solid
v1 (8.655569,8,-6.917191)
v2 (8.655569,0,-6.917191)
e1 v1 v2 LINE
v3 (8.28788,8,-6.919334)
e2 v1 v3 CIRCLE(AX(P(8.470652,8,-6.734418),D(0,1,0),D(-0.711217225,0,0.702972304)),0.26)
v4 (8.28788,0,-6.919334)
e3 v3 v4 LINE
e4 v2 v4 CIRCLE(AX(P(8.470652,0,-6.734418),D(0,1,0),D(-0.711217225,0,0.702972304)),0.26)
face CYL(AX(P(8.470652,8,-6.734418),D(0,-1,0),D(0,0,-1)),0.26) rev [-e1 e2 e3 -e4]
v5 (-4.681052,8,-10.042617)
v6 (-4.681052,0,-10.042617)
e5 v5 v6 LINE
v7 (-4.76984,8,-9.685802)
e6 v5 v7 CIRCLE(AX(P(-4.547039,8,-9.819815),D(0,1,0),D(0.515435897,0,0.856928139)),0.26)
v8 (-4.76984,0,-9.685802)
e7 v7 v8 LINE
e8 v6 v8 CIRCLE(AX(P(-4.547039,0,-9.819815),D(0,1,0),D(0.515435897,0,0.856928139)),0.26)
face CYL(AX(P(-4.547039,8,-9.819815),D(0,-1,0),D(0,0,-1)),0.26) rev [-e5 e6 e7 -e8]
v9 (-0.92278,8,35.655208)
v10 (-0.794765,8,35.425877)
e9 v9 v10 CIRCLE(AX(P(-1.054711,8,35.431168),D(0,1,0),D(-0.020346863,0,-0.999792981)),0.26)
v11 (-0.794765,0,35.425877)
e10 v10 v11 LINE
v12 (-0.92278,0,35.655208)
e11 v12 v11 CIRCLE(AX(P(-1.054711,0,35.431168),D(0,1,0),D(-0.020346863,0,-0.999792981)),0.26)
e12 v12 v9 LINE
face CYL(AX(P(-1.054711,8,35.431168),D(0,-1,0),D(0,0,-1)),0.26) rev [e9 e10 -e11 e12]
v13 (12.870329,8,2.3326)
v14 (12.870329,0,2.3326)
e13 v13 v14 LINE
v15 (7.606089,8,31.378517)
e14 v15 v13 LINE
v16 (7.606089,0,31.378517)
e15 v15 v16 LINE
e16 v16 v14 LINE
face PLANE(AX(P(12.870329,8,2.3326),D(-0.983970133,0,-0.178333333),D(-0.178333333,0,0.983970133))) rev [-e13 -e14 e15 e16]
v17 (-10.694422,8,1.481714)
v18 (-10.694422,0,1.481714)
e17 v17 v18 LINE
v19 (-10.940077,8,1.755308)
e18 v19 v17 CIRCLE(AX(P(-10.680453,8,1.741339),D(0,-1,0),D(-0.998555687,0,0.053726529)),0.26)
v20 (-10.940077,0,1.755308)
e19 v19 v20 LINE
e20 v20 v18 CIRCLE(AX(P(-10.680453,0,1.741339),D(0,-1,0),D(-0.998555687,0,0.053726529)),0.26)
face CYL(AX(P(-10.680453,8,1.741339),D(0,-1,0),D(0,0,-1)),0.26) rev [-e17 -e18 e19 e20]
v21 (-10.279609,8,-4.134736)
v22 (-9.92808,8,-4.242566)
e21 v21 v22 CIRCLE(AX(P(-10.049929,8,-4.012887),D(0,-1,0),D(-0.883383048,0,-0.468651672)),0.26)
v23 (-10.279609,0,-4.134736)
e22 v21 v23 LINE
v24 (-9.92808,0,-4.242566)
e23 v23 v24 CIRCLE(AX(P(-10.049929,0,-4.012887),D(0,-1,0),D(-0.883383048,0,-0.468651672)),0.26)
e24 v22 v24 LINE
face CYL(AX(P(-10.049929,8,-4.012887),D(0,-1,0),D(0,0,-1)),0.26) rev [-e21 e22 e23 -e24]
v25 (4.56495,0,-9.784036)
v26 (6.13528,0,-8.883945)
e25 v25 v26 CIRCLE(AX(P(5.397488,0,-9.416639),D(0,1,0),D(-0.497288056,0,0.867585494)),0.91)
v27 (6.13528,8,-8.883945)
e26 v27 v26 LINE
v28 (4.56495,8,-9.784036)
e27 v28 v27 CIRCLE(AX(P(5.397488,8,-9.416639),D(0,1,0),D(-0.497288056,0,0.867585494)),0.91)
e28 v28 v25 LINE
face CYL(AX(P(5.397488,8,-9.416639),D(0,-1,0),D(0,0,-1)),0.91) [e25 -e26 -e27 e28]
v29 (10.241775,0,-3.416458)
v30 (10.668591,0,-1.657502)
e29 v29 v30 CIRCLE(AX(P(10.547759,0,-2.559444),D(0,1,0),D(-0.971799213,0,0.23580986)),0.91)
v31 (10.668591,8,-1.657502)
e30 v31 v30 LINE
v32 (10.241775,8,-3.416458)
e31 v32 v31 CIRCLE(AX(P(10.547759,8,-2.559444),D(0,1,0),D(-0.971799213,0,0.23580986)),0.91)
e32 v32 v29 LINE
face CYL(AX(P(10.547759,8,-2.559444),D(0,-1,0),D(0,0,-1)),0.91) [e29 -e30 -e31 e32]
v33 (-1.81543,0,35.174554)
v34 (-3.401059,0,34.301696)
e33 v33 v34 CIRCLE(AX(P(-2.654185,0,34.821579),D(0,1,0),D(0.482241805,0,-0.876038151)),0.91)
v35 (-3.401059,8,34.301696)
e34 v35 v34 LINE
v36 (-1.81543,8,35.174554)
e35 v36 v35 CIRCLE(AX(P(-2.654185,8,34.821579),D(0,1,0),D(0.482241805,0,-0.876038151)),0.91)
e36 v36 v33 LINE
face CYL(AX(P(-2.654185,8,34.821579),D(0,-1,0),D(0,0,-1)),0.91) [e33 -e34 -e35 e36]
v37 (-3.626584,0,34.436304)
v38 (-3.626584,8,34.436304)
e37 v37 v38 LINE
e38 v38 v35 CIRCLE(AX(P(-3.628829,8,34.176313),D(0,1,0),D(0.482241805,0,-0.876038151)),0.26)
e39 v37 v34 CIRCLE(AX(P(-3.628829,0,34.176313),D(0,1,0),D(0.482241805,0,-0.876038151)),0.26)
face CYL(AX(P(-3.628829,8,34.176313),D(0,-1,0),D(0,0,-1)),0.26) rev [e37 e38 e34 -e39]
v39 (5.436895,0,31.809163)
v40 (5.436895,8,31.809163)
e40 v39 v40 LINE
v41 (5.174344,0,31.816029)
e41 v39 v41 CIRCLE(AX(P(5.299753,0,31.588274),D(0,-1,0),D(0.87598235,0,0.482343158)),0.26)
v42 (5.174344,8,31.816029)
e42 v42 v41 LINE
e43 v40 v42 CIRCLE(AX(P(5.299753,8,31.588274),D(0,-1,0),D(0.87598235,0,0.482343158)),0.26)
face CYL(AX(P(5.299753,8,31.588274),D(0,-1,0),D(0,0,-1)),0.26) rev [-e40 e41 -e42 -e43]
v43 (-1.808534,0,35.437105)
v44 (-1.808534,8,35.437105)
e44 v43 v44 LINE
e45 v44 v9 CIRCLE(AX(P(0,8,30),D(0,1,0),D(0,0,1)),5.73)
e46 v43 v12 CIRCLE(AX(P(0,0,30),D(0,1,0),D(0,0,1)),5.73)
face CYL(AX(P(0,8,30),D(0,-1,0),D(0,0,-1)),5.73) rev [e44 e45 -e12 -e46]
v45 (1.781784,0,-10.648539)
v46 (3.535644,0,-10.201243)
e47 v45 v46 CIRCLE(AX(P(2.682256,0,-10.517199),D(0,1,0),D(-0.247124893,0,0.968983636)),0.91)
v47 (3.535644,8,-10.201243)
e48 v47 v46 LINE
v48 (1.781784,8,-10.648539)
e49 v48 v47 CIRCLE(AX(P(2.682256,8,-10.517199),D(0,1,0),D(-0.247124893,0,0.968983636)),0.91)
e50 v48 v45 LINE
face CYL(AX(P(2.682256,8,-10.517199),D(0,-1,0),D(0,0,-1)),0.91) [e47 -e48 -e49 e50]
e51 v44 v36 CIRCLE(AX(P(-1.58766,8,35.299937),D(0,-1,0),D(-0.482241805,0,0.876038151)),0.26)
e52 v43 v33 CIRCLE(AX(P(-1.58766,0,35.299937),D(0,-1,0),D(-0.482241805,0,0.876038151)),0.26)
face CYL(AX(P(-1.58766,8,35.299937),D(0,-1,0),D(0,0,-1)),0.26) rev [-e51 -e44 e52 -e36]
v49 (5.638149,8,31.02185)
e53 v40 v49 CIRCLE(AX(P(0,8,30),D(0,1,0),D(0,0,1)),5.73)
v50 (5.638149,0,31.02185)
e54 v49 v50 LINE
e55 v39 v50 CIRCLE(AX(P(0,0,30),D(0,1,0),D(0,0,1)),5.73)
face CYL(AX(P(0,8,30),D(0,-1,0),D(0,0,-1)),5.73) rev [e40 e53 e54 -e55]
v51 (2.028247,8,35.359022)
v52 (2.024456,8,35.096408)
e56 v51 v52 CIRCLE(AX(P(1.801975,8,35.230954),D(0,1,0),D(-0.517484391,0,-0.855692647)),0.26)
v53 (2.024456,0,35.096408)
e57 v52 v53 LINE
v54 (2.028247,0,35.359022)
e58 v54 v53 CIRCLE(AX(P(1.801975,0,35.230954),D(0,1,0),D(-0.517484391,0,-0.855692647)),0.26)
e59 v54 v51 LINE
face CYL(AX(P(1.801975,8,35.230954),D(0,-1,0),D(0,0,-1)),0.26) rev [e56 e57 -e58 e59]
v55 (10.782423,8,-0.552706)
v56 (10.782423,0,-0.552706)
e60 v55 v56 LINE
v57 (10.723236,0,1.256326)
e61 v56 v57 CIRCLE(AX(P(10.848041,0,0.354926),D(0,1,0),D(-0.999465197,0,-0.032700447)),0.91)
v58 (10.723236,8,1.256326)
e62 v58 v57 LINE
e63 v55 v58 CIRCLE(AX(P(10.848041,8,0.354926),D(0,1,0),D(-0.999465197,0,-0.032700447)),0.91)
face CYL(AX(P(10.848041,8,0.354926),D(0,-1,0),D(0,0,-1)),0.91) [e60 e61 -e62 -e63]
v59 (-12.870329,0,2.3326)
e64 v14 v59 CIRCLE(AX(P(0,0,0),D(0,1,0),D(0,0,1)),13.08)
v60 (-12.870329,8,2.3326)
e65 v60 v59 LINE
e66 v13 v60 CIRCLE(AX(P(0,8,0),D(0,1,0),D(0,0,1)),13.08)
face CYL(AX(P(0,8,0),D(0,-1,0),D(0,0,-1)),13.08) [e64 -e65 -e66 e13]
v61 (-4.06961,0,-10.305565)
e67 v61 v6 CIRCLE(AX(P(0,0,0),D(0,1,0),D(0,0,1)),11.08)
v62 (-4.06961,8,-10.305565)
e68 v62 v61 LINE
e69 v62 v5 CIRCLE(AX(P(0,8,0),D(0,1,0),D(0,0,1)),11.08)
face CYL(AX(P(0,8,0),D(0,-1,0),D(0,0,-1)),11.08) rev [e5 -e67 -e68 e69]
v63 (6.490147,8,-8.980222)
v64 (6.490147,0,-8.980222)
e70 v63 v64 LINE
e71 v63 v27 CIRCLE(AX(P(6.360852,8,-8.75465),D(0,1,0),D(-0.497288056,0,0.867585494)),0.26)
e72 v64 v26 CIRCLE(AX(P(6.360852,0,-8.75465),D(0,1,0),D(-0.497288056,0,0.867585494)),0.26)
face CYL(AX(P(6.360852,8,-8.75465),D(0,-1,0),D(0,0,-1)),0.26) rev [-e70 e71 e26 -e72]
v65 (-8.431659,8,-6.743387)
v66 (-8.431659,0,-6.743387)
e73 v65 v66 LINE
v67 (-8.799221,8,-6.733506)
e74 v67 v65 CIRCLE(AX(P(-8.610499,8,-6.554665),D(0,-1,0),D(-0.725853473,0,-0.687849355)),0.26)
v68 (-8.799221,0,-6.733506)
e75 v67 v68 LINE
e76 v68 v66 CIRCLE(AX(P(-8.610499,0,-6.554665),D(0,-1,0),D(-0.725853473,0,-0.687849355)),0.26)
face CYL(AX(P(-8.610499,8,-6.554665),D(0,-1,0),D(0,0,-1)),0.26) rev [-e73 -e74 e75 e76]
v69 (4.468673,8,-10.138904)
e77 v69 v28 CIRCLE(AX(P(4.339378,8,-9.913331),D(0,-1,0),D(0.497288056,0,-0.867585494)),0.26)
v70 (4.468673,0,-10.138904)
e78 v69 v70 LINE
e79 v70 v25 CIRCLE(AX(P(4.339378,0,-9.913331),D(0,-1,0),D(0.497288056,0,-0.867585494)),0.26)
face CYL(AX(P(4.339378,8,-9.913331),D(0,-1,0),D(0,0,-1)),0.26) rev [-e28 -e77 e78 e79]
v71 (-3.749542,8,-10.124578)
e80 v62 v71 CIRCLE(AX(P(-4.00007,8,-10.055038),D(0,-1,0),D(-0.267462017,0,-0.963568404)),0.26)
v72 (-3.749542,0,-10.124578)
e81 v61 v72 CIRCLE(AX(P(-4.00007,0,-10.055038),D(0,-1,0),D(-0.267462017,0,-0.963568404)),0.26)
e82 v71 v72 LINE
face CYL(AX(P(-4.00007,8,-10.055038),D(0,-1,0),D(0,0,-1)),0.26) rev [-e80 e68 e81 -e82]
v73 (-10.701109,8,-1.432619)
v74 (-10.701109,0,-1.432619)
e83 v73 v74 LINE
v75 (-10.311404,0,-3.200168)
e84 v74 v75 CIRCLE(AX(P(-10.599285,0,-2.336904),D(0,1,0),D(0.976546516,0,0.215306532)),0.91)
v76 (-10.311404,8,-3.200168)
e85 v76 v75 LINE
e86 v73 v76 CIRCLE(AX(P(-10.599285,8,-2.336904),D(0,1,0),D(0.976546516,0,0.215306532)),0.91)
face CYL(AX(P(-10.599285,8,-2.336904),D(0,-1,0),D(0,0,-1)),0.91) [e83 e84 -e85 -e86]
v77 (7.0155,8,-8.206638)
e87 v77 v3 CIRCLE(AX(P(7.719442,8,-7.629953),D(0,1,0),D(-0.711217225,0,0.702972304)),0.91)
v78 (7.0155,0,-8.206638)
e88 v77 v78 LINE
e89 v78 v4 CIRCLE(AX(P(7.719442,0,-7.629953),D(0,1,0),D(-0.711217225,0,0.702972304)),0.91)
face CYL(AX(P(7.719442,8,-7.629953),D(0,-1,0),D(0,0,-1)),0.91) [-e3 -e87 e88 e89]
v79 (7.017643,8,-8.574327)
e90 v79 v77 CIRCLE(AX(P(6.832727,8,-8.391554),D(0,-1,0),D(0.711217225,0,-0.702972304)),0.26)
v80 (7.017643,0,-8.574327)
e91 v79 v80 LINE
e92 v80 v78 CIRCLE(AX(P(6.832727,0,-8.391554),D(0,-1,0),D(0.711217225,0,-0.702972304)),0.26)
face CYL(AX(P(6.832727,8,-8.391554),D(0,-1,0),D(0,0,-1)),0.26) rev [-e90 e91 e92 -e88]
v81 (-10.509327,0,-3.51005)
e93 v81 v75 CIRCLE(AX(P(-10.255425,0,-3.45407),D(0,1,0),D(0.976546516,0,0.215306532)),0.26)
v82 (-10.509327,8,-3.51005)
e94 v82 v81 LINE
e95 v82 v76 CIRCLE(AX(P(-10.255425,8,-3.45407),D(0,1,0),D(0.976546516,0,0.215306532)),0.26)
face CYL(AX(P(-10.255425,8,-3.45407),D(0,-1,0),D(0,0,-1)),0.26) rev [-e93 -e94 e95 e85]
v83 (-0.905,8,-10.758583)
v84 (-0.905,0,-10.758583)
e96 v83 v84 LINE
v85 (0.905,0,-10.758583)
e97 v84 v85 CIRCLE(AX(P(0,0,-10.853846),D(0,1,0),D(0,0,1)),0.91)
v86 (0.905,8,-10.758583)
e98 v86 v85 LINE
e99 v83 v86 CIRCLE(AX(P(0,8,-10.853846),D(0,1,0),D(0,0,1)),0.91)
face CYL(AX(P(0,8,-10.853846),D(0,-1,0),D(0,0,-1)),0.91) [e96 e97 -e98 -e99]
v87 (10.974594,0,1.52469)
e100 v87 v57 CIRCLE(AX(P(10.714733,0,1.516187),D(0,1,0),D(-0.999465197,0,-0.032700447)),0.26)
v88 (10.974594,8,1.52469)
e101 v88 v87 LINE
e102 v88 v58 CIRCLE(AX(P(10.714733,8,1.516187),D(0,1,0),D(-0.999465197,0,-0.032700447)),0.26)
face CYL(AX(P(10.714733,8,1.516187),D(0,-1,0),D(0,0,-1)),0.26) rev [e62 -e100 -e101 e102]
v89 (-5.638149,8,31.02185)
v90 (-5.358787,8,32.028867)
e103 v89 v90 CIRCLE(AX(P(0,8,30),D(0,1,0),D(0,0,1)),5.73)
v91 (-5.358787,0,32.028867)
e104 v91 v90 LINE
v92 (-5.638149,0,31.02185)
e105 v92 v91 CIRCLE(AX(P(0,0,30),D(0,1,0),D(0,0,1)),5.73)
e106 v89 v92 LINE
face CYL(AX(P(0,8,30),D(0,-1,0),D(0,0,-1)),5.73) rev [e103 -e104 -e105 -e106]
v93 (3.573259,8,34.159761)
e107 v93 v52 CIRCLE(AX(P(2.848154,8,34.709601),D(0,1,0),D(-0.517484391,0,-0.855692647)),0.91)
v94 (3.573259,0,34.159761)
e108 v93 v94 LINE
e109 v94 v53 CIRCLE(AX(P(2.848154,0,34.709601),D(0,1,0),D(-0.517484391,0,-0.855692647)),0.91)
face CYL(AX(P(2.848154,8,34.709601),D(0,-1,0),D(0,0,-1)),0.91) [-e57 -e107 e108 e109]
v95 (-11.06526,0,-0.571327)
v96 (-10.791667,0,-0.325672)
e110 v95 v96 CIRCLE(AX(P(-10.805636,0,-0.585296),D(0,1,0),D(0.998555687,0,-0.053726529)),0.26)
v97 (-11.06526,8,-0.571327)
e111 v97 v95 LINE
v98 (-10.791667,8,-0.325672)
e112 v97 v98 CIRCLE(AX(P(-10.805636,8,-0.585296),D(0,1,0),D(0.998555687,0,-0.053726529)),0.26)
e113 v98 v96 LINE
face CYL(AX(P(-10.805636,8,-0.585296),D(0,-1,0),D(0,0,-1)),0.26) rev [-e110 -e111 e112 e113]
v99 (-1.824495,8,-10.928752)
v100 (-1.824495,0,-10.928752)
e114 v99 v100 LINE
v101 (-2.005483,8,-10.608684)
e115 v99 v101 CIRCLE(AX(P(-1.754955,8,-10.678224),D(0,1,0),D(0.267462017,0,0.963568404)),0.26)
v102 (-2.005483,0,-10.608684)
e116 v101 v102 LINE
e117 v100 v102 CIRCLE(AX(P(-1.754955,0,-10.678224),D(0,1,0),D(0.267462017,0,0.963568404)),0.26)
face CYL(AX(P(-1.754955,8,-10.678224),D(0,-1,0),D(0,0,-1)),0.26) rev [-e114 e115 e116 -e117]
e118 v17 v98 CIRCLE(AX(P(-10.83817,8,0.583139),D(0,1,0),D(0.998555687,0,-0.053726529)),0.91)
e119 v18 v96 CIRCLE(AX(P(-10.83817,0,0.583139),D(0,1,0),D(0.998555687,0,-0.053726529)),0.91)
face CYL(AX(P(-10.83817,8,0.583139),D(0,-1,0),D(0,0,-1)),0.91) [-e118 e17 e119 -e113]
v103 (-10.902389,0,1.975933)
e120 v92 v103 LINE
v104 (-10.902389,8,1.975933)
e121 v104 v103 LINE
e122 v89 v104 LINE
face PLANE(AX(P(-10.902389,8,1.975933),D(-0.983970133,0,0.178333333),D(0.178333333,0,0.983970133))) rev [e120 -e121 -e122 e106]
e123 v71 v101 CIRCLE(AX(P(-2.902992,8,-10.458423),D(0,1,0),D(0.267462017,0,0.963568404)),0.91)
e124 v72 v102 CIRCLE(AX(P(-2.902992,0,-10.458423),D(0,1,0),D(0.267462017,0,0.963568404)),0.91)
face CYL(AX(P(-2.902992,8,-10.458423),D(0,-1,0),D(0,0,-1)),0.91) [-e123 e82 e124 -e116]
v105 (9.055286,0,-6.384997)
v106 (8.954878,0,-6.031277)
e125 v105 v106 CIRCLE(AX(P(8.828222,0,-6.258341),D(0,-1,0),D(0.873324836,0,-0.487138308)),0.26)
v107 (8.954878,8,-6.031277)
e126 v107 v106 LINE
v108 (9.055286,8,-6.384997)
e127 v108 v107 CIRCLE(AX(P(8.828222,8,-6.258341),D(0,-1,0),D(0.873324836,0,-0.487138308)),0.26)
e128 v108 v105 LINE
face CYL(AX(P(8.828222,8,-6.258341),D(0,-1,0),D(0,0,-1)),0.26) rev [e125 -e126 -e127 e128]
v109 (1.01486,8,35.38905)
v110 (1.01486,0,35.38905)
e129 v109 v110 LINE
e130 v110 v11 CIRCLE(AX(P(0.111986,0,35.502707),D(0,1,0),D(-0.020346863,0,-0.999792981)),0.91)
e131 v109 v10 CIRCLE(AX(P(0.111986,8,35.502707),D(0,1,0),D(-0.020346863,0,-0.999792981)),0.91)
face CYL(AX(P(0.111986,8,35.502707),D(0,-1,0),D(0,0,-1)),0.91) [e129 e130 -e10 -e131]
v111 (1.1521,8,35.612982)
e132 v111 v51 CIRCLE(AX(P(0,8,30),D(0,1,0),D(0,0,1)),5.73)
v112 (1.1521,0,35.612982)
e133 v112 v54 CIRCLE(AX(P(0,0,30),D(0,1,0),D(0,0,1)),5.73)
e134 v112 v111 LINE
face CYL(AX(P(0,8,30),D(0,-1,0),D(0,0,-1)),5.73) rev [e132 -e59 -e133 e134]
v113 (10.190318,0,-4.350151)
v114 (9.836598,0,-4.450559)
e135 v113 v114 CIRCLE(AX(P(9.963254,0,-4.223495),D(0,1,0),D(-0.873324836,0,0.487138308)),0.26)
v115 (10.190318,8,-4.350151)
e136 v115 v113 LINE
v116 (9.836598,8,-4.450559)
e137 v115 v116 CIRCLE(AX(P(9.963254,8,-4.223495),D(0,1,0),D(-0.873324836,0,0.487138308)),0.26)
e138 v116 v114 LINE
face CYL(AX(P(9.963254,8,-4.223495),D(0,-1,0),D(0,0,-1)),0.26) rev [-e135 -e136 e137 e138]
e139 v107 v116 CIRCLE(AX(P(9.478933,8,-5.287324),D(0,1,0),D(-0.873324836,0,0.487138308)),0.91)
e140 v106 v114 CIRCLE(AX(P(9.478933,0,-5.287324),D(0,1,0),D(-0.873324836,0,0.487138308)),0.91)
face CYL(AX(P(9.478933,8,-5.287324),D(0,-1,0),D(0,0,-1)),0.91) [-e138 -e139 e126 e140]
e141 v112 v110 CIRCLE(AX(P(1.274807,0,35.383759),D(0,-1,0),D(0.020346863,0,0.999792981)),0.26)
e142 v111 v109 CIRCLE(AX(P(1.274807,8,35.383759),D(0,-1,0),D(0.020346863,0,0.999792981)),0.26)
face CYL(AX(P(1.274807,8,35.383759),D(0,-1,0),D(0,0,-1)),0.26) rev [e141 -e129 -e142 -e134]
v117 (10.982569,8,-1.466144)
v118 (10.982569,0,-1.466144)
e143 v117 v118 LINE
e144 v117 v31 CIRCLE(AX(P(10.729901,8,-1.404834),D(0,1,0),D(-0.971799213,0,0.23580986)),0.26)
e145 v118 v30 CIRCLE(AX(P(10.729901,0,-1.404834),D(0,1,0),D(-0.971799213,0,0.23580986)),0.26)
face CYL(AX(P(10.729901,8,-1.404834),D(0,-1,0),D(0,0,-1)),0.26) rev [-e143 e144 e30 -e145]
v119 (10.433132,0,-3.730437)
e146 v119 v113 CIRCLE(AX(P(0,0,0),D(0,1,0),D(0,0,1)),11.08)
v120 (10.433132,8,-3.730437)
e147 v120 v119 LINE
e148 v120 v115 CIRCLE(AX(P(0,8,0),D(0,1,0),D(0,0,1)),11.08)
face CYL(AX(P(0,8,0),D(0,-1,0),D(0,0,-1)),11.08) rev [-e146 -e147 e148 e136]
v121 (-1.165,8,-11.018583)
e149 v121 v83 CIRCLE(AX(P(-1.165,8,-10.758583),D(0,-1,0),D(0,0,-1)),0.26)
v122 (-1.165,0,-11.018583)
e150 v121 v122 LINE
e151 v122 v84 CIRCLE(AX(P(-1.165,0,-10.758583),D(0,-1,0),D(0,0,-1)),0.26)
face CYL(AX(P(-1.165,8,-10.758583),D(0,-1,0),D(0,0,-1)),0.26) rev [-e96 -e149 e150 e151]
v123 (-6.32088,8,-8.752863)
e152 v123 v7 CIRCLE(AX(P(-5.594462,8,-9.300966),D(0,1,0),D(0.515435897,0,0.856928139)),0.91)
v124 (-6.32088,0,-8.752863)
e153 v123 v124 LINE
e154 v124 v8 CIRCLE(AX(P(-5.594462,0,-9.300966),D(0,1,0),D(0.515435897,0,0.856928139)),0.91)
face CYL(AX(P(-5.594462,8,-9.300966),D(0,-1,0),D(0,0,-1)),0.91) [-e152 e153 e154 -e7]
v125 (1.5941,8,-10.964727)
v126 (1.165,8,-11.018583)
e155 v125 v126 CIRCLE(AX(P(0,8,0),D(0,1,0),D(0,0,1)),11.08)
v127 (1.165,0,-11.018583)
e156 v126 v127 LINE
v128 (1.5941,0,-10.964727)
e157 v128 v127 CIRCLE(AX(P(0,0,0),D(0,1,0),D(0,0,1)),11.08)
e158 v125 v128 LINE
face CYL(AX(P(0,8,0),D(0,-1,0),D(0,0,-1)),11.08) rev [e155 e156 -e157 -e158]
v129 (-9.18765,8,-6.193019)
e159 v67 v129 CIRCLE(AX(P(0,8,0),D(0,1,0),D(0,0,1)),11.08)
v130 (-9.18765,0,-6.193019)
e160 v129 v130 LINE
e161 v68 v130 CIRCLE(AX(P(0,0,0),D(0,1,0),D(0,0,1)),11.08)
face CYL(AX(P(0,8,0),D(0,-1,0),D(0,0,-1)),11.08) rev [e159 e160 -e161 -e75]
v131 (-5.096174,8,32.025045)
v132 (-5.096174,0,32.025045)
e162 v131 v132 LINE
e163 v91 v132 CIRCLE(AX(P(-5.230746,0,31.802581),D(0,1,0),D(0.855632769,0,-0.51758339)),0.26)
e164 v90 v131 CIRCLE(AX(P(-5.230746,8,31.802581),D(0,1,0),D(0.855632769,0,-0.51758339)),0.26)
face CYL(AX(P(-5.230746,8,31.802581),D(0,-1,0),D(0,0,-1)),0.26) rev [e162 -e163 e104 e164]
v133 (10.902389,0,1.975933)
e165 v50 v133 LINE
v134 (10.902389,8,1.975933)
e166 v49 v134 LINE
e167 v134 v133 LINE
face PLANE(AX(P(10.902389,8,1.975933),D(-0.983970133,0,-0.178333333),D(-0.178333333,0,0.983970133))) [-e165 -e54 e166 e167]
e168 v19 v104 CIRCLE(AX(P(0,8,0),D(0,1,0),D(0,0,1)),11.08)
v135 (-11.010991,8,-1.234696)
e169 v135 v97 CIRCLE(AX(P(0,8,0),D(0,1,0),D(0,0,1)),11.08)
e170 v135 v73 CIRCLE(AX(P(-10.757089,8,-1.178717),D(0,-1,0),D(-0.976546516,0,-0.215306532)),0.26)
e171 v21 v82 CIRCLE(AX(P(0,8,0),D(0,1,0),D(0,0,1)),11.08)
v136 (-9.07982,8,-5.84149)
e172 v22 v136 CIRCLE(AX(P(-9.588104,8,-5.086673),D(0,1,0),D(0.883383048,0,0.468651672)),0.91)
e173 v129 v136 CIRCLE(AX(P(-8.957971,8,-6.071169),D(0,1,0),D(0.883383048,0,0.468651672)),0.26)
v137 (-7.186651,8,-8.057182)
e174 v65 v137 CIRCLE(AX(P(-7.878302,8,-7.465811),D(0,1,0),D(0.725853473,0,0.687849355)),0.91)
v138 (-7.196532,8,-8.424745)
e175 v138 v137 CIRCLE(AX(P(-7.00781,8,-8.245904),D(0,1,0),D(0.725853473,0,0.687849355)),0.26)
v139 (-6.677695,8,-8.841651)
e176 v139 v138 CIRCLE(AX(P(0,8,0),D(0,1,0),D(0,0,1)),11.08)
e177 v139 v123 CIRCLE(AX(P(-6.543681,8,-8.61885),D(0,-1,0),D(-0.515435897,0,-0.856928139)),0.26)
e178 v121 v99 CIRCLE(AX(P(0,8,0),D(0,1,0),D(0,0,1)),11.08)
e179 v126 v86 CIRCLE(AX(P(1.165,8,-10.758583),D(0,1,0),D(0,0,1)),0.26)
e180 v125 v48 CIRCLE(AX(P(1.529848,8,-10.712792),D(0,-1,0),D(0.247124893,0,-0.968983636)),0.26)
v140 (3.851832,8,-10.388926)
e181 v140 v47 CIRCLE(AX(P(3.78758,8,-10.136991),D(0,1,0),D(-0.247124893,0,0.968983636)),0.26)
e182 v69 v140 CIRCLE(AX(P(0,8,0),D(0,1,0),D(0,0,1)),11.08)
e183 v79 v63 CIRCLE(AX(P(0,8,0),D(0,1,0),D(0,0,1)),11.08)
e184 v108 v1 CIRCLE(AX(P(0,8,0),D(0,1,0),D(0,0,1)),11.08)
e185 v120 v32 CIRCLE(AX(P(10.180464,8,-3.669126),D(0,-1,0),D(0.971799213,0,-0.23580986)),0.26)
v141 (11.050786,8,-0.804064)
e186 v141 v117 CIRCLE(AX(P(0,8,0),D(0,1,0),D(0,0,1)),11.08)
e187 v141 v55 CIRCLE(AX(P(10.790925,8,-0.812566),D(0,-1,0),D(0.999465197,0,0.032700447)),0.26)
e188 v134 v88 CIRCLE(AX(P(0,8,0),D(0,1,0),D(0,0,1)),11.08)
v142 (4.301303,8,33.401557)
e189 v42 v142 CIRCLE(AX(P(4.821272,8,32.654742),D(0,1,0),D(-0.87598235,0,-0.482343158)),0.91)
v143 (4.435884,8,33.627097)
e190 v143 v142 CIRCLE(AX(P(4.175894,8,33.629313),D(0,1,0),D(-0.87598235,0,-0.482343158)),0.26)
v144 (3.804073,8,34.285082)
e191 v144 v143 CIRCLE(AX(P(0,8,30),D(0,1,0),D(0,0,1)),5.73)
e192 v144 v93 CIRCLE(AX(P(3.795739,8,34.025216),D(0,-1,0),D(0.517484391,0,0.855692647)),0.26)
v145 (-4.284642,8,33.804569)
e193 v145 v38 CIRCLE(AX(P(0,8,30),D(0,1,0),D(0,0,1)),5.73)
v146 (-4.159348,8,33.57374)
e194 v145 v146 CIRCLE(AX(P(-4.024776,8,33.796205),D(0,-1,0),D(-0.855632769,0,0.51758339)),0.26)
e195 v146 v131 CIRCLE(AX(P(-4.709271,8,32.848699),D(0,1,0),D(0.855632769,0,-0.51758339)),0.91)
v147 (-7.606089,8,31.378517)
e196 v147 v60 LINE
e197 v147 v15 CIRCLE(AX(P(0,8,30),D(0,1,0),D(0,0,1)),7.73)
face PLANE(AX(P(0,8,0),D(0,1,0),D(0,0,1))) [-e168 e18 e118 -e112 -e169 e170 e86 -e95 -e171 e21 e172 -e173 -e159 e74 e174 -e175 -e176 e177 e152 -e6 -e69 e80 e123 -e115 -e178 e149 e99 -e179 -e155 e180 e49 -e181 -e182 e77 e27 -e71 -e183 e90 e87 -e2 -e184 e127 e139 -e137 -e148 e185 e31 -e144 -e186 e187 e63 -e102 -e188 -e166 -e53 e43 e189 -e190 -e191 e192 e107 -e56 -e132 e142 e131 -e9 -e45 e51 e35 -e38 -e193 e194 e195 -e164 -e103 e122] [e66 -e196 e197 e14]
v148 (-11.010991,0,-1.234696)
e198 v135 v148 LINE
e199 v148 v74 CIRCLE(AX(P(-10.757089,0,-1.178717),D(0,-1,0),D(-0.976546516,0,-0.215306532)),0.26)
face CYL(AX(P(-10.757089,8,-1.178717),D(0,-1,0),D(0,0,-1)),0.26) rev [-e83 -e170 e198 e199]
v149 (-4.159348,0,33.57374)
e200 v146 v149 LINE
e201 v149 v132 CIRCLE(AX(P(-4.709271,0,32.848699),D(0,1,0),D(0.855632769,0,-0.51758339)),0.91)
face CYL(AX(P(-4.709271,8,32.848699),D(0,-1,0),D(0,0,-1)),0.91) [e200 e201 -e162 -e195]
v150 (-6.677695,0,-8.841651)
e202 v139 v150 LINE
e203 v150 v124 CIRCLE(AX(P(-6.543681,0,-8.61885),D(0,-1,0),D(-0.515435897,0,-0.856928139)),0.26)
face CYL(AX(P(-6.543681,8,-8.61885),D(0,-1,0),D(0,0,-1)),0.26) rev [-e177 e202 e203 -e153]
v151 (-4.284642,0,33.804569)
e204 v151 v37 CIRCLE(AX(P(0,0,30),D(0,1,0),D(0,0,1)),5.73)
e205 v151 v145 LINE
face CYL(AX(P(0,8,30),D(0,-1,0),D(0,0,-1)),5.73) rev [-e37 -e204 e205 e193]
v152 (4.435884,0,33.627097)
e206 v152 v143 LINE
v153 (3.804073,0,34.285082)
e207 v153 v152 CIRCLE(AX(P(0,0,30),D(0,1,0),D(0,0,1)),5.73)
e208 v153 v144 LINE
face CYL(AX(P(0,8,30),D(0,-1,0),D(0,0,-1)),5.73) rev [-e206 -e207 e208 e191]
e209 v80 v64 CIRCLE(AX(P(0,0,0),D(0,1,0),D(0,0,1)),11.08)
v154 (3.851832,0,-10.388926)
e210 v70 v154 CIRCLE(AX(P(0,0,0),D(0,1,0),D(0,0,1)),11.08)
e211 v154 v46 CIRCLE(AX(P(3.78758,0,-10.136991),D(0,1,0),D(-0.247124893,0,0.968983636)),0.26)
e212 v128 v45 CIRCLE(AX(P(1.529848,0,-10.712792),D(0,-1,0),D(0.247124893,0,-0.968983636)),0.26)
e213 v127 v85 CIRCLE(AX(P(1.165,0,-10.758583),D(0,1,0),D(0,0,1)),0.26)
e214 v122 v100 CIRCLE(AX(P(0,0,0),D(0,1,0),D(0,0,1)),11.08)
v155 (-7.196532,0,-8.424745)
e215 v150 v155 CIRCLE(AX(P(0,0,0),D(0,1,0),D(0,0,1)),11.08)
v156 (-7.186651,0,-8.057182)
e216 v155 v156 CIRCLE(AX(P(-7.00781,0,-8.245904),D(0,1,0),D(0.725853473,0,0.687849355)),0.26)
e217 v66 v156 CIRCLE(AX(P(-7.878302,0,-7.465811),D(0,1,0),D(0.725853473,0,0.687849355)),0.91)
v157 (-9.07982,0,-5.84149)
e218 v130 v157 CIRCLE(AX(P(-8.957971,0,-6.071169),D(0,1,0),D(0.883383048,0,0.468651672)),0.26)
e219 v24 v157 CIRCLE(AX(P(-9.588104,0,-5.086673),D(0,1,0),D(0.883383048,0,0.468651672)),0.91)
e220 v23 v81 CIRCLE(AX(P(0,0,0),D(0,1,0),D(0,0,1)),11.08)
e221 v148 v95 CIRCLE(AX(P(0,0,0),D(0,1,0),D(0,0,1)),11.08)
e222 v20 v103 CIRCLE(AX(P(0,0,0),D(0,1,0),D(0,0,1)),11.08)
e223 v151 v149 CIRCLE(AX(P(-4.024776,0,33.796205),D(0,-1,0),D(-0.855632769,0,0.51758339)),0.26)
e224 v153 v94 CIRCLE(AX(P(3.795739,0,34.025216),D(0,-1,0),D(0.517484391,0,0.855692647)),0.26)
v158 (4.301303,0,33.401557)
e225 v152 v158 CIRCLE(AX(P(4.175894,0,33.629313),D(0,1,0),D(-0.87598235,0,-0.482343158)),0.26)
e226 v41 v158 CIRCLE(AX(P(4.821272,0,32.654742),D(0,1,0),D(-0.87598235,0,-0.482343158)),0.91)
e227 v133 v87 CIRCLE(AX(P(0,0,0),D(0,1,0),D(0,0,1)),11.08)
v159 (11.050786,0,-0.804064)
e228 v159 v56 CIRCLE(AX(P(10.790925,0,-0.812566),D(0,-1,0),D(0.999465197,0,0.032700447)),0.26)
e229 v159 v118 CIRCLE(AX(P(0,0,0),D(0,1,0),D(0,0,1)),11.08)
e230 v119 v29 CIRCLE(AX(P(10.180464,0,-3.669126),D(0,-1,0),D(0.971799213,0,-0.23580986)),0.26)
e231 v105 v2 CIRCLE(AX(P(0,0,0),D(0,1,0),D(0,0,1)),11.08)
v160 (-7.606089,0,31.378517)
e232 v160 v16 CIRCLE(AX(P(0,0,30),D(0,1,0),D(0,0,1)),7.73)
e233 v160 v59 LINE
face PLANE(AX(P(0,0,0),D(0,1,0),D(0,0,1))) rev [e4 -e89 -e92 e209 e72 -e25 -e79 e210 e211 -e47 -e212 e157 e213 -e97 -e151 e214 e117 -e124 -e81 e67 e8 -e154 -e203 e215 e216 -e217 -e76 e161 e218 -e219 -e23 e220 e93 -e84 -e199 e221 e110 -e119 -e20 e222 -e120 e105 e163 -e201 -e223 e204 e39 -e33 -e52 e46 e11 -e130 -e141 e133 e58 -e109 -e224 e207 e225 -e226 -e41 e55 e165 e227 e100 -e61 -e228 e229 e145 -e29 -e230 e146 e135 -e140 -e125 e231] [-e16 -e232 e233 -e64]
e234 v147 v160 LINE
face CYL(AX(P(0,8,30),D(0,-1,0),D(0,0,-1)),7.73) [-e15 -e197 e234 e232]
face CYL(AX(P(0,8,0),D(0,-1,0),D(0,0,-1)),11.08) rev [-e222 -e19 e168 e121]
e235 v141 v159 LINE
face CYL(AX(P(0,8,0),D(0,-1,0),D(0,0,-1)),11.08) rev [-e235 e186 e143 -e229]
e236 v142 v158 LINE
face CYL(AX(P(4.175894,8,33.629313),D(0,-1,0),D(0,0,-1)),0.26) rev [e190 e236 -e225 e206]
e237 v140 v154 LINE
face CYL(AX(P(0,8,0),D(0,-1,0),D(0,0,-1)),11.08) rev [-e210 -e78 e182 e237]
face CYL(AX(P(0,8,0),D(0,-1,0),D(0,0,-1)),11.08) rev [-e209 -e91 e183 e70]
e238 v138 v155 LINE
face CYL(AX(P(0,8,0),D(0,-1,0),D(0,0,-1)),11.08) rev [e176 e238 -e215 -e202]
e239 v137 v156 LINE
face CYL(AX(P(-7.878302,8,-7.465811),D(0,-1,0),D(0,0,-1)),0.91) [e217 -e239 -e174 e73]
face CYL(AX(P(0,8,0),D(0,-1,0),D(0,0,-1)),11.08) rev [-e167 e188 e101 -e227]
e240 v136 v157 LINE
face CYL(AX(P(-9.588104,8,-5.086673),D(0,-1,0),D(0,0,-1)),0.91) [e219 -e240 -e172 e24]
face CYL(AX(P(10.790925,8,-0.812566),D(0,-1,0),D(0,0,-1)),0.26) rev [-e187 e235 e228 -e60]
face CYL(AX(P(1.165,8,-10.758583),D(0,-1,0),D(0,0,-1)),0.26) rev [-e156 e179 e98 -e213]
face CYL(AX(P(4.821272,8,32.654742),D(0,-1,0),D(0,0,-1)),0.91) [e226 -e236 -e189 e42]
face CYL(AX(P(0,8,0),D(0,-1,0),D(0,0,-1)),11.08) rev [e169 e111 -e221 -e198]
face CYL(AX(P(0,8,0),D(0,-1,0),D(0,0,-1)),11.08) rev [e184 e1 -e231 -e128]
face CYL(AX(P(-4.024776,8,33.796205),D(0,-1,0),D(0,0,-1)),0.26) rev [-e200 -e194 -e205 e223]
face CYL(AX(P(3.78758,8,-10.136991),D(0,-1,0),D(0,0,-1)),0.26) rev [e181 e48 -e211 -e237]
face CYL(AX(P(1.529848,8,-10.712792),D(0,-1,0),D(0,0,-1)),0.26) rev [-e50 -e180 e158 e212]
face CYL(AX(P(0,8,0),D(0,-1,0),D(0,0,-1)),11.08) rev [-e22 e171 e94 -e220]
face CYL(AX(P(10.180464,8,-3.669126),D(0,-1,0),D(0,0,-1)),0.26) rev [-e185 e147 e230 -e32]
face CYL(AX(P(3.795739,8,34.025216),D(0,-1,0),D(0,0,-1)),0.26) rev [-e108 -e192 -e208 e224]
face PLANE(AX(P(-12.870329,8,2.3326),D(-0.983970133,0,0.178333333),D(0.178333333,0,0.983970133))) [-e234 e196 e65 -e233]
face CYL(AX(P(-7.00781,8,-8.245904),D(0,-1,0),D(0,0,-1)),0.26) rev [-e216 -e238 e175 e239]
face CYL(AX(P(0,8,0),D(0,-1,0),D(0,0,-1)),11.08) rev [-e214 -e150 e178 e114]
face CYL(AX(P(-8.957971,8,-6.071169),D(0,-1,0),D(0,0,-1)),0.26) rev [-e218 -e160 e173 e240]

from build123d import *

# Parameters (mm, degrees)
BOSS_EXTRUDE1_DEPTH = 8
BOSS_EXTRUDE3_DEPTH = 8
CRVPATTERN1_DEPTH   = 8


# Read off the part's stored shape, not the designer's step: CrvPattern1
with BuildPart() as part:
    # Sketch1 → Boss-Extrude1 (new body)
    with BuildSketch(Plane(origin=(0, 0, 0), x_dir=(1, 0, 0), z_dir=(0, 1, 0))):
        with BuildLine():
            Line((-7.606089126, -31.378516667), (-12.870329337, -2.3326))
            ThreePointArc((-12.870329337, -2.3326), (0, 13.08), (12.870329337, -2.3326))
            Line((12.870329337, -2.3326), (7.606089126, -31.378516667))
            ThreePointArc((7.606089126, -31.378516667), (0, -37.73), (-7.606089126, -31.378516667))
        make_face()
        with BuildLine():
            ThreePointArc((-5.638148861, -31.02185), (0, -35.73), (5.638148861, -31.02185))
            Line((5.638148861, -31.02185), (10.902389071, -1.975933333))
            ThreePointArc((10.902389071, -1.975933333), (0, 11.08), (-10.902389071, -1.975933333))
            Line((-10.902389071, -1.975933333), (-5.638148861, -31.02185))
        make_face(mode=Mode.SUBTRACT)
    extrude(amount=BOSS_EXTRUDE1_DEPTH)

    # Sketch2 → Boss-Extrude3 (add)
    with BuildSketch(Plane(origin=(0, 0, 0), x_dir=(1, 0, 0), z_dir=(0, 1, 0))):
        with BuildLine():
            ThreePointArc((-1.165, 11.018583167), (-0.981152237, 10.94243093), (-0.905, 10.758583167))
            ThreePointArc((-0.905, 10.758583167), (0, 9.943845961), (0.905, 10.758583167))
            ThreePointArc((0.905, 10.758583167), (0.981152237, 10.94243093), (1.165, 11.018583167))
            ThreePointArc((1.165, 11.018583167), (0, 11.08), (-1.165, 11.018583167))
        make_face()
    extrude(amount=BOSS_EXTRUDE3_DEPTH)

    # CrvPattern1 outline → CrvPattern1 (add)
    with BuildSketch(Plane(origin=(0, 0, 0), x_dir=(1, 0, 0), z_dir=(0, 1, 0))):
        with BuildLine():
            ThreePointArc((-1.824495283, 10.928751849), (-2.963479144, 10.676337919), (-4.069609665, 10.30556535))
            ThreePointArc((-4.069609665, 10.30556535), (-3.872091938, 10.281359754), (-3.749541755, 10.124577689))
            ThreePointArc((-3.749541755, 10.124577689), (-2.659601093, 9.581575785), (-2.005482944, 10.608683939))
            ThreePointArc((-2.005482944, 10.608683939), (-1.981277348, 10.806201665), (-1.824495283, 10.928751849))
        make_face()
        with BuildLine():
            ThreePointArc((-10.791666914, 0.325671569), (-10.979340539, 0.391836316), (-11.06526029, 0.57132715))
            ThreePointArc((-11.06526029, 0.57132715), (-11.063997012, -0.595289939), (-10.940077478, -1.755307601))
            ThreePointArc((-10.940077478, -1.755307601), (-10.873912731, -1.567633976), (-10.694421897, -1.481714224))
            ThreePointArc((-10.694421897, -1.481714224), (-9.929483935, -0.534248326), (-10.791666914, 0.325671569))
        make_face()
        with BuildLine():
            ThreePointArc((-10.311404493, 3.200167829), (-10.474544311, 3.314117655), (-10.509326889, 3.510049622))
            ThreePointArc((-10.509326889, 3.510049622), (-10.820135393, 2.385596376), (-11.010991108, 1.23469624))
            ThreePointArc((-11.010991108, 1.23469624), (-10.897041283, 1.397836059), (-10.701109316, 1.432618636))
            ThreePointArc((-10.701109316, 1.432618636), (-9.710628125, 2.14097499), (-10.311404493, 3.200167829))
        make_face()
        with BuildLine():
            ThreePointArc((-9.079820232, 5.841489648), (-9.206539356, 5.994921805), (-9.18765039, 6.193018676))
            ThreePointArc((-9.18765039, 6.193018676), (-9.787884177, 5.192660526), (-10.279608785, 4.134736173))
            ThreePointArc((-10.279608785, 4.134736173), (-10.126176628, 4.261455297), (-9.928079758, 4.242566331))
            ThreePointArc((-9.928079758, 4.242566331), (-8.784224959, 4.660200036), (-9.079820232, 5.841489648))
        make_face()
        with BuildLine():
            ThreePointArc((-7.18665129, 8.057181889), (-7.267716561, 8.23891682), (-7.196532361, 8.424744624))
            ThreePointArc((-7.196532361, 8.424744624), (-8.042456481, 7.621370857), (-8.799221359, 6.733506032))
            ThreePointArc((-8.799221359, 6.733506032), (-8.617486428, 6.814571302), (-8.431658623, 6.743387102))
            ThreePointArc((-8.431658623, 6.743387102), (-7.217775126, 6.839868035), (-7.18665129, 8.057181889))
        make_face()
        with BuildLine():
            ThreePointArc((-4.76984, 9.685802142), (-4.799344742, 9.88259806), (-4.681052017, 10.042616791))
            ThreePointArc((-4.681052017, 10.042616791), (-5.71102974, 9.494763784), (-6.677694581, 8.841651151))
            ThreePointArc((-6.677694581, 8.841651151), (-6.480898663, 8.871155893), (-6.320879932, 8.752863168))
            ThreePointArc((-6.320879932, 8.752863168), (-5.125415163, 8.521161417), (-4.76984, 9.685802142))
        make_face()
        with BuildLine():
            ThreePointArc((-5.358787187, -32.02886665), (-4.902775765, -32.965752822), (-4.284641775, -33.804568945))
            ThreePointArc((-4.284641775, -33.804568945), (-4.253283685, -33.672171144), (-4.159348022, -33.573740464))
            ThreePointArc((-4.159348022, -33.573740464), (-3.930645139, -32.377698364), (-5.096173957, -32.025045153))
            ThreePointArc((-5.096173957, -32.025045153), (-5.226962568, -32.062553109), (-5.358787187, -32.02886665))
        make_face()
        with BuildLine():
            ThreePointArc((4.301302835, -33.401557112), (4.399165403, -33.496084492), (4.435884173, -33.627096856))
            ThreePointArc((4.435884173, -33.627096856), (5.019378866, -32.763826296), (5.436895219, -31.809162894))
            ThreePointArc((5.436895219, -31.809162894), (5.306550294, -31.848184784), (5.174343952, -31.816029058))
            ThreePointArc((5.174343952, -31.816029058), (4.024127982, -32.215810168), (4.301302835, -33.401557112))
        make_face()
        with BuildLine():
            ThreePointArc((2.024455519, -35.096408218), (2.061948343, -35.227201168), (2.028246633, -35.359021888))
            ThreePointArc((2.028246633, -35.359021888), (2.965185558, -34.903118865), (3.804073193, -34.28508193))
            ThreePointArc((3.804073193, -34.28508193), (3.671679021, -34.253708522), (3.57325921, -34.159761471))
            ThreePointArc((3.57325921, -34.159761471), (2.377243578, -33.930920208), (2.024455519, -35.096408218))
        make_face()
        with BuildLine():
            ThreePointArc((-0.794764946, -35.425877399), (-0.827686591, -35.557895098), (-0.922779735, -35.655208003))
            ThreePointArc((-0.922779735, -35.655208003), (0.116587527, -35.728813782), (1.15209953, -35.612981977))
            ThreePointArc((1.15209953, -35.612981977), (1.053125917, -35.519618539), (1.01486035, -35.389049577))
            ThreePointArc((1.01486035, -35.389049577), (0.093470356, -34.592894948), (-0.794764946, -35.425877399))
        make_face()
        with BuildLine():
            ThreePointArc((-3.401059435, -34.301696362), (-3.495575491, -34.399569865), (-3.626583606, -34.436303793))
            ThreePointArc((-3.626583606, -34.436303793), (-2.763245543, -35.019698603), (-1.808533841, -35.4371045))
            ThreePointArc((-1.808533841, -35.4371045), (-1.847570812, -35.30676409), (-1.815430382, -35.174554029))
            ThreePointArc((-1.815430382, -35.174554029), (-2.215344568, -34.02438432), (-3.401059435, -34.301696362))
        make_face()
        with BuildLine():
            ThreePointArc((10.974594379, -1.524689547), (11.074074387, -0.36232095), (11.05078642, 0.804064363))
            ThreePointArc((11.05078642, 0.804064363), (10.968663006, 0.622805134), (10.782423353, 0.552705528))
            ThreePointArc((10.782423353, 0.552705528), (9.938527966, -0.325168205), (10.723235544, -1.25632648))
            ThreePointArc((10.723235544, -1.25632648), (10.904494773, -1.338449894), (10.974594379, -1.524689547))
        make_face()
        with BuildLine():
            ThreePointArc((3.535643905, 10.201243009), (3.654867535, 10.36056937), (3.851832122, 10.388926282))
            ThreePointArc((3.851832122, 10.388926282), (2.738143815, 10.73633869), (1.59410025, 10.964727283))
            ThreePointArc((1.59410025, 10.964727283), (1.753426611, 10.845503653), (1.781783523, 10.648539065))
            ThreePointArc((1.781783523, 10.648539065), (2.457371869, 9.635424017), (3.535643905, 10.201243009))
        make_face()
        with BuildLine():
            ThreePointArc((6.135279783, 8.883944999), (6.292773656, 9.005579053), (6.490146906, 8.980222333))
            ThreePointArc((6.490146906, 8.980222333), (5.509951663, 9.612847272), (4.468672705, 10.138903504))
            ThreePointArc((4.468672705, 10.138903504), (4.590306759, 9.981409631), (4.564950039, 9.784036381))
            ThreePointArc((4.564950039, 9.784036381), (4.944955829, 8.627136509), (6.135279783, 8.883944999))
        make_face()
        with BuildLine():
            ThreePointArc((8.287879594, 6.919334403), (8.472168203, 6.994413506), (8.655568872, 6.917190724))
            ThreePointArc((8.655568872, 6.917190724), (7.880286848, 7.788933123), (7.017643405, 8.574326857))
            ThreePointArc((7.017643405, 8.574326857), (7.092722508, 8.390038247), (7.015499725, 8.206637579))
            ThreePointArc((7.015499725, 8.206637579), (7.072234526, 6.990248301), (8.287879594, 6.919334403))
        make_face()
        with BuildLine():
            ThreePointArc((9.836598048, 4.450559019), (10.034253538, 4.473612668), (10.190318466, 4.350150522))
            ThreePointArc((10.190318466, 4.350150522), (9.676439183, 5.397492448), (9.055286209, 6.38499739))
            ThreePointArc((9.055286209, 6.38499739), (9.078339857, 6.187341901), (8.954877712, 6.031276973))
            ThreePointArc((8.954877712, 6.031276973), (8.684207644, 4.844028293), (9.836598048, 4.450559019))
        make_face()
        with BuildLine():
            ThreePointArc((10.668590575, 1.657501702), (10.865211135, 1.626850133), (10.982568934, 1.46614447))
            ThreePointArc((10.982568934, 1.46614447), (10.767535277, 2.612773248), (10.43313196, 3.730436636))
            ThreePointArc((10.43313196, 3.730436636), (10.402480392, 3.533816076), (10.241774729, 3.416458277))
            ThreePointArc((10.241774729, 3.416458277), (9.663421677, 2.344856923), (10.668590575, 1.657501702))
        make_face()
    extrude(amount=CRVPATTERN1_DEPTH)


solid = part.part
